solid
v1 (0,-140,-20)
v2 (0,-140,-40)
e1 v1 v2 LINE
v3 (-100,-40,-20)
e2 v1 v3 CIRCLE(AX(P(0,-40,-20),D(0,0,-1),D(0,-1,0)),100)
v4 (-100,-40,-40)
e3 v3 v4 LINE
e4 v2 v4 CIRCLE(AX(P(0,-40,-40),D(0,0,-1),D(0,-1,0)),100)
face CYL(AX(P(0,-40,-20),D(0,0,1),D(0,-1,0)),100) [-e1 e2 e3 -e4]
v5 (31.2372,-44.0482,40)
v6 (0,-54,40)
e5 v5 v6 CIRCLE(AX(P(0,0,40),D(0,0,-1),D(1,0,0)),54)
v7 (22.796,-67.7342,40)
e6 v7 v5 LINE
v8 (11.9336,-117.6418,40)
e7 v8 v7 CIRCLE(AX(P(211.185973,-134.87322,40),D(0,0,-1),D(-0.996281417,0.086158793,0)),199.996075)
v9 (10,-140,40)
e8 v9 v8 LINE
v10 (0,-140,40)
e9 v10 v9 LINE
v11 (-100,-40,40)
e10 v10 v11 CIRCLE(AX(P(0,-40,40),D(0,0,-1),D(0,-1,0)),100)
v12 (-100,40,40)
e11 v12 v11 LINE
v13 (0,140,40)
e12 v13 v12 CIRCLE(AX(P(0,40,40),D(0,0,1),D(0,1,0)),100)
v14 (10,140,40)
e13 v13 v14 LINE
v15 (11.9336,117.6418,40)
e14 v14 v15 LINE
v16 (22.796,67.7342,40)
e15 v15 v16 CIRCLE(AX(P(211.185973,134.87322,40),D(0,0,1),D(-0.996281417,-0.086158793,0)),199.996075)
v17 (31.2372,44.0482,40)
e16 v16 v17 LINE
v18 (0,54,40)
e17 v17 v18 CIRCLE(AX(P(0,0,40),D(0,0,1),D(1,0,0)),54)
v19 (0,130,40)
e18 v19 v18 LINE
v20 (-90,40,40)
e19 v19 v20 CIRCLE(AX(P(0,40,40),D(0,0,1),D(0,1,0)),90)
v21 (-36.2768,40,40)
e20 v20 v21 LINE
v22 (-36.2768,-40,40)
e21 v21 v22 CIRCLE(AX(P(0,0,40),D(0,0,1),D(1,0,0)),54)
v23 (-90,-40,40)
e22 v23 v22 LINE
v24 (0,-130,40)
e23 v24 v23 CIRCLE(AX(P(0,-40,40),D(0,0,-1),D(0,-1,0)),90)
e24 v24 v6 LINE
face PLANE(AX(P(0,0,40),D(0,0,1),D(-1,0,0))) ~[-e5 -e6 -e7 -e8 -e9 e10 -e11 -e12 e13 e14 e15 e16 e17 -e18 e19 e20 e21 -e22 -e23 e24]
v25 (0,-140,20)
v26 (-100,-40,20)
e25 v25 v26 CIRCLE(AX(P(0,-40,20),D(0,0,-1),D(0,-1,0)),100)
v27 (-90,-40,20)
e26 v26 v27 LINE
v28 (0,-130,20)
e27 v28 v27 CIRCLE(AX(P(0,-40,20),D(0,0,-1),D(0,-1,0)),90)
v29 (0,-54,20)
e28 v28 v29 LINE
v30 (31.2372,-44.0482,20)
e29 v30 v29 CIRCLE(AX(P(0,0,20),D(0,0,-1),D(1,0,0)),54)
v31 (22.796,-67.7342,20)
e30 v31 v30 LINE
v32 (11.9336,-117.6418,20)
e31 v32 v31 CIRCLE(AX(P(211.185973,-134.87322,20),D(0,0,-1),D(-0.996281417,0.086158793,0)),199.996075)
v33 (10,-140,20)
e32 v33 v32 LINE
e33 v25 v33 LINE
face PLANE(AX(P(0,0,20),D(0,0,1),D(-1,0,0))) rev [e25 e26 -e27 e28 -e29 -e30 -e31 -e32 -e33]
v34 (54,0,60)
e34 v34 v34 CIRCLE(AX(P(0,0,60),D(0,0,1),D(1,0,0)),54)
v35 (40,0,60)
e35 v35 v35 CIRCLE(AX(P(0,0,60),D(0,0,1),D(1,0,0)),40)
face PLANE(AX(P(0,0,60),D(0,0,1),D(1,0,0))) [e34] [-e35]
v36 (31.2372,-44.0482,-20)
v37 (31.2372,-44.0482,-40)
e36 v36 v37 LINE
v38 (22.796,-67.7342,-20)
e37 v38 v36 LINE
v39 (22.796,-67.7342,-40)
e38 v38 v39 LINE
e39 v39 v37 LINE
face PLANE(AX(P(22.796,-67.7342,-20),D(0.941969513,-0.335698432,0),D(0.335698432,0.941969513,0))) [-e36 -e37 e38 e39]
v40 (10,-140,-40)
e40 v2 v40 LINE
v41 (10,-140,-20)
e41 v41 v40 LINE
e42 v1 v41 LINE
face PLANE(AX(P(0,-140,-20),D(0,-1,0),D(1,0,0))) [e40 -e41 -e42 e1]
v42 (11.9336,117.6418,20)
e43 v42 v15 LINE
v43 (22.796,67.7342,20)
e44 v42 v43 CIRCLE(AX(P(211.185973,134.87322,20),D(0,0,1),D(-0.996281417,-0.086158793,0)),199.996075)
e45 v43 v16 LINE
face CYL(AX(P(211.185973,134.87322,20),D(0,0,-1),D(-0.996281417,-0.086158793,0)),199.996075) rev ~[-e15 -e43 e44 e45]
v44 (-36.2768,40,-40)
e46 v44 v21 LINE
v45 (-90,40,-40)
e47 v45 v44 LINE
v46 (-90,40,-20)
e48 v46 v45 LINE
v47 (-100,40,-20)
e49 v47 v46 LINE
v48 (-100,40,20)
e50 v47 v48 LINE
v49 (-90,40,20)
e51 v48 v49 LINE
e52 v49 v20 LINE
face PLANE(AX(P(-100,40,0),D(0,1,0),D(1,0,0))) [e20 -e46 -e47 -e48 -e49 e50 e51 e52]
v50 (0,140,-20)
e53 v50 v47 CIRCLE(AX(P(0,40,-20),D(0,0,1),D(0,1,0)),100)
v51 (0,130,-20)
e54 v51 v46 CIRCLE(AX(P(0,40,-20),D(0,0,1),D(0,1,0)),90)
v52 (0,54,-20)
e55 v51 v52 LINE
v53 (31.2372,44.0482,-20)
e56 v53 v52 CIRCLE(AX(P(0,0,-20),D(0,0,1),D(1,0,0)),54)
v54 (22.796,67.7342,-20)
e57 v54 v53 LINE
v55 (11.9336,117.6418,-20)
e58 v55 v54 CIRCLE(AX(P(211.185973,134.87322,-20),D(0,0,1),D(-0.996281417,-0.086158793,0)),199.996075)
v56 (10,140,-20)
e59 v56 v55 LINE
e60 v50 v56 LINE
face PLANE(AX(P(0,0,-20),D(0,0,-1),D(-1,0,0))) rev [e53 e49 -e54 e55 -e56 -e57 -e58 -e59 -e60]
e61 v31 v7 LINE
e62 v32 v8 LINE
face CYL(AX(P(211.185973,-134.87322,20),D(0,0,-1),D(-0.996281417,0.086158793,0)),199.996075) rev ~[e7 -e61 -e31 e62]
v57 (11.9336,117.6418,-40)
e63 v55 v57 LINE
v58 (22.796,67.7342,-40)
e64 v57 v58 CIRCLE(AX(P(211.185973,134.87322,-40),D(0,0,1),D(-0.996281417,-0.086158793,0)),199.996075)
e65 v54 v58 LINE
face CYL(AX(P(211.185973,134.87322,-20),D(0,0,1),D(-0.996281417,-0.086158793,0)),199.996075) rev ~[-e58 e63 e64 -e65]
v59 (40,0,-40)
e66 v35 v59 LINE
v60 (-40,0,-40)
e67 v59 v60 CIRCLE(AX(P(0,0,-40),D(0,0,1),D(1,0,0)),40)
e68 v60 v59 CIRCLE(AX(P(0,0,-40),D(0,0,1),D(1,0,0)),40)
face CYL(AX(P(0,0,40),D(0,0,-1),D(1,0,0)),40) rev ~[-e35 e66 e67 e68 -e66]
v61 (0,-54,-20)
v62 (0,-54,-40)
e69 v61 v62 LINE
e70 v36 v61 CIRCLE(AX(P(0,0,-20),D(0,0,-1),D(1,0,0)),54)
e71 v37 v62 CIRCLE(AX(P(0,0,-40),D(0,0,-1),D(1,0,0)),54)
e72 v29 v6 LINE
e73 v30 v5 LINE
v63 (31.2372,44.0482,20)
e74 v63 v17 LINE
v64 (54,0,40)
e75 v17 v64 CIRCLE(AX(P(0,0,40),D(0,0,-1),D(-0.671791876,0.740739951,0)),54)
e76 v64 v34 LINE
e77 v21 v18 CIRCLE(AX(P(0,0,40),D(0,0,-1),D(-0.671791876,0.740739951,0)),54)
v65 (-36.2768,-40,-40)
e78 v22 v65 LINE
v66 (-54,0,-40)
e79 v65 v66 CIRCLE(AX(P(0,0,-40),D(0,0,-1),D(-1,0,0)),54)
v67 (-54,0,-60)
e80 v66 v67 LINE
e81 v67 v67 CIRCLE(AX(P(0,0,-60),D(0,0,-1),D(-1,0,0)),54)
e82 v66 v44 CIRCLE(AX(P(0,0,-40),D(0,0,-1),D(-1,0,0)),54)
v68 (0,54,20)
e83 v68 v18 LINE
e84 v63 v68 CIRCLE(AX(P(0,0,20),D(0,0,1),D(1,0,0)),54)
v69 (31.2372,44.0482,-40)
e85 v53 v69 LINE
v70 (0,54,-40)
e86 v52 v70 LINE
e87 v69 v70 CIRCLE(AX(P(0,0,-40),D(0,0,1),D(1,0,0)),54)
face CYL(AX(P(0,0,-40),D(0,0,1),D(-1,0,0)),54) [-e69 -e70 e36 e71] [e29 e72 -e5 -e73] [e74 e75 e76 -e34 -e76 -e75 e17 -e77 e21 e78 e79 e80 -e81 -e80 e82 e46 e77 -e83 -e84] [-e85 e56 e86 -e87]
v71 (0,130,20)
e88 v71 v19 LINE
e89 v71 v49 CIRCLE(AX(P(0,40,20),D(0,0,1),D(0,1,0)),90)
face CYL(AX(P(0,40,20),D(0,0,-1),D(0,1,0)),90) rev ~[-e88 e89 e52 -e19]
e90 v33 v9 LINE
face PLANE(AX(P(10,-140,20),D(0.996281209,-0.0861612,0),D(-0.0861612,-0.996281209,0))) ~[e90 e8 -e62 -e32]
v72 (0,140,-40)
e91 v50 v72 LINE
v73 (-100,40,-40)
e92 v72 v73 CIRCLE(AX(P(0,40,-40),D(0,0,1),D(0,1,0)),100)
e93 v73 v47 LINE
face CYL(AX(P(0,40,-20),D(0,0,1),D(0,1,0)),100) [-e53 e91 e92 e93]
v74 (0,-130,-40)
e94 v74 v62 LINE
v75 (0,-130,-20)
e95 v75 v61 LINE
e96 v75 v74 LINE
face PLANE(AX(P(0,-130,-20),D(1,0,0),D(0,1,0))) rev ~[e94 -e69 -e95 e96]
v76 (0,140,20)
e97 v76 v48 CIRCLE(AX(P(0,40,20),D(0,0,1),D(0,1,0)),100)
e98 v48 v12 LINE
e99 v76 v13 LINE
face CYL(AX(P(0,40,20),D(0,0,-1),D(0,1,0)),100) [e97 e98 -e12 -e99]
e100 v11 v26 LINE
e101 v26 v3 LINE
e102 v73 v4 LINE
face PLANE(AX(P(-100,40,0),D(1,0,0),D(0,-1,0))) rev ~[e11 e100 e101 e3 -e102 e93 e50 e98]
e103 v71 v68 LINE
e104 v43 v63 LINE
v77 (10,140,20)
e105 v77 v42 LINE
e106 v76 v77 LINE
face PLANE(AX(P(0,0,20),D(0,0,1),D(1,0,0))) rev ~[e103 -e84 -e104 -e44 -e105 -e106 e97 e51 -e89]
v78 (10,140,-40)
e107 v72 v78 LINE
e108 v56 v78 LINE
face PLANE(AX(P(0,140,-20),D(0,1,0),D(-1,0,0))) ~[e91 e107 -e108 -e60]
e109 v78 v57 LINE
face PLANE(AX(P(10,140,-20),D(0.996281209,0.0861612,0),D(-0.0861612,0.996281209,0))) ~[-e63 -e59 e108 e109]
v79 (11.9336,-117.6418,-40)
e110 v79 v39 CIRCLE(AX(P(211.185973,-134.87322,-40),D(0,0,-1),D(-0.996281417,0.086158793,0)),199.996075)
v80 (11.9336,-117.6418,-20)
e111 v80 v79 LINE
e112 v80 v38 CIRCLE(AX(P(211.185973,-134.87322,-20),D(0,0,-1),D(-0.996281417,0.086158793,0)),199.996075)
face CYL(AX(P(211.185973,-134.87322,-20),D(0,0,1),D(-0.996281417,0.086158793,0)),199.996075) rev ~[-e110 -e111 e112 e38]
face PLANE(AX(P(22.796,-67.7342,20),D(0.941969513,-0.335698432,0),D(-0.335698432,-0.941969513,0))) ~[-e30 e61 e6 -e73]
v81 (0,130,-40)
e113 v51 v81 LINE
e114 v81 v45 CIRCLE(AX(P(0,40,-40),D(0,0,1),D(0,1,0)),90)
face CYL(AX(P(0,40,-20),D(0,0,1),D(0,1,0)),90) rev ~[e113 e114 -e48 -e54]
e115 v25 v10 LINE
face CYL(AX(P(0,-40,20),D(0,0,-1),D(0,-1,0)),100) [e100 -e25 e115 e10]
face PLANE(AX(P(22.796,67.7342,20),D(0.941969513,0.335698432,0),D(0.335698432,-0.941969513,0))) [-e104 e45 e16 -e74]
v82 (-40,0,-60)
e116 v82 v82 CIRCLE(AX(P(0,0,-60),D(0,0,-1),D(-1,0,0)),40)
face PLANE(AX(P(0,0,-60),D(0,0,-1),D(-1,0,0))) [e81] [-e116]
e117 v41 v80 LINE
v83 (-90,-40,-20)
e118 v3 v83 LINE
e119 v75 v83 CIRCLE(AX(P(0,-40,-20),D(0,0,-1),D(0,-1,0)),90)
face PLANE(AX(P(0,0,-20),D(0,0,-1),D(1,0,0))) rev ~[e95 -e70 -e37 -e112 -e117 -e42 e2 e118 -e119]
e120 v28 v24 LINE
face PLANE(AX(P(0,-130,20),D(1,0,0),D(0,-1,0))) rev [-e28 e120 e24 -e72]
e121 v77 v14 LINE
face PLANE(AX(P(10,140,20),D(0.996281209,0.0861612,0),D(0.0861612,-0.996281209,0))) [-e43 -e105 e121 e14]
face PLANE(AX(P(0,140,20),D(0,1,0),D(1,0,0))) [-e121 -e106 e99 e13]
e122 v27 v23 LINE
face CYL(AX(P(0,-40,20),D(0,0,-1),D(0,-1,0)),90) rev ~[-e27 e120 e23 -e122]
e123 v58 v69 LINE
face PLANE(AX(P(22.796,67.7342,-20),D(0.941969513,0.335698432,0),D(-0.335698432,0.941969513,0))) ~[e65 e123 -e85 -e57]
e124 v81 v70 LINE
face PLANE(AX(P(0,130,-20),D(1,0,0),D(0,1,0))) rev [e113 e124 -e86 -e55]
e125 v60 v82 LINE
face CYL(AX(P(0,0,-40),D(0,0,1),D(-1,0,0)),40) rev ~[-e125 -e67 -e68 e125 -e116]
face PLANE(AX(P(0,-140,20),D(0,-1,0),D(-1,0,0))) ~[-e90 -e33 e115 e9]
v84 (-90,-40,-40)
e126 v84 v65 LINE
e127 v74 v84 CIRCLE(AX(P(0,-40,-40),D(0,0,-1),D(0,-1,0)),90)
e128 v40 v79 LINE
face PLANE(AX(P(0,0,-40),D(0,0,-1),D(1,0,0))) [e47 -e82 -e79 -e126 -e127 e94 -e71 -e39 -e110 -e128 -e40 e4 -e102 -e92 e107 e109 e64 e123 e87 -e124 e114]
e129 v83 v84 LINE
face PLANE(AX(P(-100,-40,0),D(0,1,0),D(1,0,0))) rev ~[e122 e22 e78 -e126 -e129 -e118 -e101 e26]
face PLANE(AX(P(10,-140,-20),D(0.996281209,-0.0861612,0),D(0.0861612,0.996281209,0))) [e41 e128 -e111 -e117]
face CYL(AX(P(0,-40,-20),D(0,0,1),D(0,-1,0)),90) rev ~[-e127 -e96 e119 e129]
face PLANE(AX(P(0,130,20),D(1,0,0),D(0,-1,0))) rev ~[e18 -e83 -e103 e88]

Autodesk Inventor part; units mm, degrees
ref_plane "YZ Plane" through (0, 0, 0) normal (1, 0, 0) x (0, 1, 0)
ref_plane "XZ Plane" through (0, 0, 0) normal (0, 1, 0) x (-1, 0, 0)
sketch "Sketch1" plane through (0, 0, 0) normal (0, 0, 1) x (1, 0, 0)
  circle A0 centre (0, 0) radius 20
  circle A1 centre (0, 0) radius 27
  line L0 (-27, 0) -> (-50, 0) construction
  line L1 (-50, 20) -> (-50, -20)
  line L2 (-50, 20) -> (-18.1384, 20)
  line L3 (-50, -20) -> (-18.1384, -20)
  dimension "d0" = 40
  dimension "d1" = 54
  dimension "d2" = 23
  dimension "d3" = 50
  dimension "d4" = 40
  dimension "d5" = 20
  dimension "d6" = 20
sketch "Sketch2" plane through (0, 0, 0) normal (0, 0, 1) x (1, 0, 0)
  point P0 (0, 0)
sketch "Sketch3" plane through (0, 0, 0) normal (0, 0, 1) x (1, 0, 0)
  point P0 (0, 0)
extrude "Extrusion1" add sketch "Sketch1" along normal mid plane 40
sketch "Sketch4" plane through (0, 0, 20) normal (0, 0, 1) x (1, 0, 0)
  circle A0 centre (0, 0) radius 20
  circle A1 centre (0, 0) radius 27
  dimension "d9" = 40
  dimension "d10" = 54
extrude "Extrusion2" add sketch "Sketch4" along normal blind 10
sketch "Sketch5" plane through (0, 0, -20) normal (0, 0, -1) x (-1, 0, 0)
  circle A0 centre (0, 0) radius 20
  circle A1 centre (0, 0) radius 27
  dimension "d13" = 40
  dimension "d14" = 54
extrude "Extrusion3" add sketch "Sketch5" along normal blind 10
sketch "Sketch6" plane through (0, 0, 0) normal (0, 0, 1) x (1, 0, 0)
  point P0 (0, 0)
ref_plane "Work Plane1" through (0, 0, 10) normal (0, 0, 1) x (1, 0, 0)
sketch "Sketch7" plane through (0, 0, 10) normal (0, 0, 1) x (1, 0, 0)
  circle A0 centre (0, 0) radius 20 projected
  line L0 (-50, 20) -> (-18.1384, 20) projected
  arc A1 (0, 70) -> (-50, 20) centre (0, 20) ccw
  arc A2 (0, 65) -> (-45, 20) centre (0, 20) ccw
  line L1 (0, 65) -> (0, 27)
  circle A3 centre (0, 0) radius 27 projected
  line L2 (0, 70) -> (5, 70)
  line L3 (5, 70) -> (5.9668, 58.8209)
  line L4 (11.398, 33.8671) -> (15.6186, 22.0241)
  arc A4 (5.9668, 58.8209) -> (11.398, 33.8671) centre (105.5949, 67.4369) ccw
  point P0 (7.7299, 38.4334)
  point P1 (5, 51.8198)
  dimension "d18" = 50
  dimension "d19" = 45
  dimension "d20" = 38
  dimension "d21" = 5
  dimension "d22" = 5
  dimension "d23" = 31.5666
  dimension "d24" = 94.943
  dimension "d25" = 29.7957
  dimension "d26" = 165.328
  dimension "d27" = 22.1057
  dimension "d28" = 100
extrude "Extrusion4" add sketch "Sketch7" along normal blind 10 contours A1 L2 L3 A4 L4 A3 L1 A2 L0
mirror "Mirror1" about plane through (0, 0, 0) normal (0, 0, 1) of "Extrusion4"
mirror "Mirror2" about plane through (0, 0, 0) normal (0, 1, 0) of "Extrusion4", "Mirror1"
scale "Scale1" factors (2, 2, 2) then translate (0, 0, 0) bodies 1
properties part number "project part" material "Aluminum 6061"
